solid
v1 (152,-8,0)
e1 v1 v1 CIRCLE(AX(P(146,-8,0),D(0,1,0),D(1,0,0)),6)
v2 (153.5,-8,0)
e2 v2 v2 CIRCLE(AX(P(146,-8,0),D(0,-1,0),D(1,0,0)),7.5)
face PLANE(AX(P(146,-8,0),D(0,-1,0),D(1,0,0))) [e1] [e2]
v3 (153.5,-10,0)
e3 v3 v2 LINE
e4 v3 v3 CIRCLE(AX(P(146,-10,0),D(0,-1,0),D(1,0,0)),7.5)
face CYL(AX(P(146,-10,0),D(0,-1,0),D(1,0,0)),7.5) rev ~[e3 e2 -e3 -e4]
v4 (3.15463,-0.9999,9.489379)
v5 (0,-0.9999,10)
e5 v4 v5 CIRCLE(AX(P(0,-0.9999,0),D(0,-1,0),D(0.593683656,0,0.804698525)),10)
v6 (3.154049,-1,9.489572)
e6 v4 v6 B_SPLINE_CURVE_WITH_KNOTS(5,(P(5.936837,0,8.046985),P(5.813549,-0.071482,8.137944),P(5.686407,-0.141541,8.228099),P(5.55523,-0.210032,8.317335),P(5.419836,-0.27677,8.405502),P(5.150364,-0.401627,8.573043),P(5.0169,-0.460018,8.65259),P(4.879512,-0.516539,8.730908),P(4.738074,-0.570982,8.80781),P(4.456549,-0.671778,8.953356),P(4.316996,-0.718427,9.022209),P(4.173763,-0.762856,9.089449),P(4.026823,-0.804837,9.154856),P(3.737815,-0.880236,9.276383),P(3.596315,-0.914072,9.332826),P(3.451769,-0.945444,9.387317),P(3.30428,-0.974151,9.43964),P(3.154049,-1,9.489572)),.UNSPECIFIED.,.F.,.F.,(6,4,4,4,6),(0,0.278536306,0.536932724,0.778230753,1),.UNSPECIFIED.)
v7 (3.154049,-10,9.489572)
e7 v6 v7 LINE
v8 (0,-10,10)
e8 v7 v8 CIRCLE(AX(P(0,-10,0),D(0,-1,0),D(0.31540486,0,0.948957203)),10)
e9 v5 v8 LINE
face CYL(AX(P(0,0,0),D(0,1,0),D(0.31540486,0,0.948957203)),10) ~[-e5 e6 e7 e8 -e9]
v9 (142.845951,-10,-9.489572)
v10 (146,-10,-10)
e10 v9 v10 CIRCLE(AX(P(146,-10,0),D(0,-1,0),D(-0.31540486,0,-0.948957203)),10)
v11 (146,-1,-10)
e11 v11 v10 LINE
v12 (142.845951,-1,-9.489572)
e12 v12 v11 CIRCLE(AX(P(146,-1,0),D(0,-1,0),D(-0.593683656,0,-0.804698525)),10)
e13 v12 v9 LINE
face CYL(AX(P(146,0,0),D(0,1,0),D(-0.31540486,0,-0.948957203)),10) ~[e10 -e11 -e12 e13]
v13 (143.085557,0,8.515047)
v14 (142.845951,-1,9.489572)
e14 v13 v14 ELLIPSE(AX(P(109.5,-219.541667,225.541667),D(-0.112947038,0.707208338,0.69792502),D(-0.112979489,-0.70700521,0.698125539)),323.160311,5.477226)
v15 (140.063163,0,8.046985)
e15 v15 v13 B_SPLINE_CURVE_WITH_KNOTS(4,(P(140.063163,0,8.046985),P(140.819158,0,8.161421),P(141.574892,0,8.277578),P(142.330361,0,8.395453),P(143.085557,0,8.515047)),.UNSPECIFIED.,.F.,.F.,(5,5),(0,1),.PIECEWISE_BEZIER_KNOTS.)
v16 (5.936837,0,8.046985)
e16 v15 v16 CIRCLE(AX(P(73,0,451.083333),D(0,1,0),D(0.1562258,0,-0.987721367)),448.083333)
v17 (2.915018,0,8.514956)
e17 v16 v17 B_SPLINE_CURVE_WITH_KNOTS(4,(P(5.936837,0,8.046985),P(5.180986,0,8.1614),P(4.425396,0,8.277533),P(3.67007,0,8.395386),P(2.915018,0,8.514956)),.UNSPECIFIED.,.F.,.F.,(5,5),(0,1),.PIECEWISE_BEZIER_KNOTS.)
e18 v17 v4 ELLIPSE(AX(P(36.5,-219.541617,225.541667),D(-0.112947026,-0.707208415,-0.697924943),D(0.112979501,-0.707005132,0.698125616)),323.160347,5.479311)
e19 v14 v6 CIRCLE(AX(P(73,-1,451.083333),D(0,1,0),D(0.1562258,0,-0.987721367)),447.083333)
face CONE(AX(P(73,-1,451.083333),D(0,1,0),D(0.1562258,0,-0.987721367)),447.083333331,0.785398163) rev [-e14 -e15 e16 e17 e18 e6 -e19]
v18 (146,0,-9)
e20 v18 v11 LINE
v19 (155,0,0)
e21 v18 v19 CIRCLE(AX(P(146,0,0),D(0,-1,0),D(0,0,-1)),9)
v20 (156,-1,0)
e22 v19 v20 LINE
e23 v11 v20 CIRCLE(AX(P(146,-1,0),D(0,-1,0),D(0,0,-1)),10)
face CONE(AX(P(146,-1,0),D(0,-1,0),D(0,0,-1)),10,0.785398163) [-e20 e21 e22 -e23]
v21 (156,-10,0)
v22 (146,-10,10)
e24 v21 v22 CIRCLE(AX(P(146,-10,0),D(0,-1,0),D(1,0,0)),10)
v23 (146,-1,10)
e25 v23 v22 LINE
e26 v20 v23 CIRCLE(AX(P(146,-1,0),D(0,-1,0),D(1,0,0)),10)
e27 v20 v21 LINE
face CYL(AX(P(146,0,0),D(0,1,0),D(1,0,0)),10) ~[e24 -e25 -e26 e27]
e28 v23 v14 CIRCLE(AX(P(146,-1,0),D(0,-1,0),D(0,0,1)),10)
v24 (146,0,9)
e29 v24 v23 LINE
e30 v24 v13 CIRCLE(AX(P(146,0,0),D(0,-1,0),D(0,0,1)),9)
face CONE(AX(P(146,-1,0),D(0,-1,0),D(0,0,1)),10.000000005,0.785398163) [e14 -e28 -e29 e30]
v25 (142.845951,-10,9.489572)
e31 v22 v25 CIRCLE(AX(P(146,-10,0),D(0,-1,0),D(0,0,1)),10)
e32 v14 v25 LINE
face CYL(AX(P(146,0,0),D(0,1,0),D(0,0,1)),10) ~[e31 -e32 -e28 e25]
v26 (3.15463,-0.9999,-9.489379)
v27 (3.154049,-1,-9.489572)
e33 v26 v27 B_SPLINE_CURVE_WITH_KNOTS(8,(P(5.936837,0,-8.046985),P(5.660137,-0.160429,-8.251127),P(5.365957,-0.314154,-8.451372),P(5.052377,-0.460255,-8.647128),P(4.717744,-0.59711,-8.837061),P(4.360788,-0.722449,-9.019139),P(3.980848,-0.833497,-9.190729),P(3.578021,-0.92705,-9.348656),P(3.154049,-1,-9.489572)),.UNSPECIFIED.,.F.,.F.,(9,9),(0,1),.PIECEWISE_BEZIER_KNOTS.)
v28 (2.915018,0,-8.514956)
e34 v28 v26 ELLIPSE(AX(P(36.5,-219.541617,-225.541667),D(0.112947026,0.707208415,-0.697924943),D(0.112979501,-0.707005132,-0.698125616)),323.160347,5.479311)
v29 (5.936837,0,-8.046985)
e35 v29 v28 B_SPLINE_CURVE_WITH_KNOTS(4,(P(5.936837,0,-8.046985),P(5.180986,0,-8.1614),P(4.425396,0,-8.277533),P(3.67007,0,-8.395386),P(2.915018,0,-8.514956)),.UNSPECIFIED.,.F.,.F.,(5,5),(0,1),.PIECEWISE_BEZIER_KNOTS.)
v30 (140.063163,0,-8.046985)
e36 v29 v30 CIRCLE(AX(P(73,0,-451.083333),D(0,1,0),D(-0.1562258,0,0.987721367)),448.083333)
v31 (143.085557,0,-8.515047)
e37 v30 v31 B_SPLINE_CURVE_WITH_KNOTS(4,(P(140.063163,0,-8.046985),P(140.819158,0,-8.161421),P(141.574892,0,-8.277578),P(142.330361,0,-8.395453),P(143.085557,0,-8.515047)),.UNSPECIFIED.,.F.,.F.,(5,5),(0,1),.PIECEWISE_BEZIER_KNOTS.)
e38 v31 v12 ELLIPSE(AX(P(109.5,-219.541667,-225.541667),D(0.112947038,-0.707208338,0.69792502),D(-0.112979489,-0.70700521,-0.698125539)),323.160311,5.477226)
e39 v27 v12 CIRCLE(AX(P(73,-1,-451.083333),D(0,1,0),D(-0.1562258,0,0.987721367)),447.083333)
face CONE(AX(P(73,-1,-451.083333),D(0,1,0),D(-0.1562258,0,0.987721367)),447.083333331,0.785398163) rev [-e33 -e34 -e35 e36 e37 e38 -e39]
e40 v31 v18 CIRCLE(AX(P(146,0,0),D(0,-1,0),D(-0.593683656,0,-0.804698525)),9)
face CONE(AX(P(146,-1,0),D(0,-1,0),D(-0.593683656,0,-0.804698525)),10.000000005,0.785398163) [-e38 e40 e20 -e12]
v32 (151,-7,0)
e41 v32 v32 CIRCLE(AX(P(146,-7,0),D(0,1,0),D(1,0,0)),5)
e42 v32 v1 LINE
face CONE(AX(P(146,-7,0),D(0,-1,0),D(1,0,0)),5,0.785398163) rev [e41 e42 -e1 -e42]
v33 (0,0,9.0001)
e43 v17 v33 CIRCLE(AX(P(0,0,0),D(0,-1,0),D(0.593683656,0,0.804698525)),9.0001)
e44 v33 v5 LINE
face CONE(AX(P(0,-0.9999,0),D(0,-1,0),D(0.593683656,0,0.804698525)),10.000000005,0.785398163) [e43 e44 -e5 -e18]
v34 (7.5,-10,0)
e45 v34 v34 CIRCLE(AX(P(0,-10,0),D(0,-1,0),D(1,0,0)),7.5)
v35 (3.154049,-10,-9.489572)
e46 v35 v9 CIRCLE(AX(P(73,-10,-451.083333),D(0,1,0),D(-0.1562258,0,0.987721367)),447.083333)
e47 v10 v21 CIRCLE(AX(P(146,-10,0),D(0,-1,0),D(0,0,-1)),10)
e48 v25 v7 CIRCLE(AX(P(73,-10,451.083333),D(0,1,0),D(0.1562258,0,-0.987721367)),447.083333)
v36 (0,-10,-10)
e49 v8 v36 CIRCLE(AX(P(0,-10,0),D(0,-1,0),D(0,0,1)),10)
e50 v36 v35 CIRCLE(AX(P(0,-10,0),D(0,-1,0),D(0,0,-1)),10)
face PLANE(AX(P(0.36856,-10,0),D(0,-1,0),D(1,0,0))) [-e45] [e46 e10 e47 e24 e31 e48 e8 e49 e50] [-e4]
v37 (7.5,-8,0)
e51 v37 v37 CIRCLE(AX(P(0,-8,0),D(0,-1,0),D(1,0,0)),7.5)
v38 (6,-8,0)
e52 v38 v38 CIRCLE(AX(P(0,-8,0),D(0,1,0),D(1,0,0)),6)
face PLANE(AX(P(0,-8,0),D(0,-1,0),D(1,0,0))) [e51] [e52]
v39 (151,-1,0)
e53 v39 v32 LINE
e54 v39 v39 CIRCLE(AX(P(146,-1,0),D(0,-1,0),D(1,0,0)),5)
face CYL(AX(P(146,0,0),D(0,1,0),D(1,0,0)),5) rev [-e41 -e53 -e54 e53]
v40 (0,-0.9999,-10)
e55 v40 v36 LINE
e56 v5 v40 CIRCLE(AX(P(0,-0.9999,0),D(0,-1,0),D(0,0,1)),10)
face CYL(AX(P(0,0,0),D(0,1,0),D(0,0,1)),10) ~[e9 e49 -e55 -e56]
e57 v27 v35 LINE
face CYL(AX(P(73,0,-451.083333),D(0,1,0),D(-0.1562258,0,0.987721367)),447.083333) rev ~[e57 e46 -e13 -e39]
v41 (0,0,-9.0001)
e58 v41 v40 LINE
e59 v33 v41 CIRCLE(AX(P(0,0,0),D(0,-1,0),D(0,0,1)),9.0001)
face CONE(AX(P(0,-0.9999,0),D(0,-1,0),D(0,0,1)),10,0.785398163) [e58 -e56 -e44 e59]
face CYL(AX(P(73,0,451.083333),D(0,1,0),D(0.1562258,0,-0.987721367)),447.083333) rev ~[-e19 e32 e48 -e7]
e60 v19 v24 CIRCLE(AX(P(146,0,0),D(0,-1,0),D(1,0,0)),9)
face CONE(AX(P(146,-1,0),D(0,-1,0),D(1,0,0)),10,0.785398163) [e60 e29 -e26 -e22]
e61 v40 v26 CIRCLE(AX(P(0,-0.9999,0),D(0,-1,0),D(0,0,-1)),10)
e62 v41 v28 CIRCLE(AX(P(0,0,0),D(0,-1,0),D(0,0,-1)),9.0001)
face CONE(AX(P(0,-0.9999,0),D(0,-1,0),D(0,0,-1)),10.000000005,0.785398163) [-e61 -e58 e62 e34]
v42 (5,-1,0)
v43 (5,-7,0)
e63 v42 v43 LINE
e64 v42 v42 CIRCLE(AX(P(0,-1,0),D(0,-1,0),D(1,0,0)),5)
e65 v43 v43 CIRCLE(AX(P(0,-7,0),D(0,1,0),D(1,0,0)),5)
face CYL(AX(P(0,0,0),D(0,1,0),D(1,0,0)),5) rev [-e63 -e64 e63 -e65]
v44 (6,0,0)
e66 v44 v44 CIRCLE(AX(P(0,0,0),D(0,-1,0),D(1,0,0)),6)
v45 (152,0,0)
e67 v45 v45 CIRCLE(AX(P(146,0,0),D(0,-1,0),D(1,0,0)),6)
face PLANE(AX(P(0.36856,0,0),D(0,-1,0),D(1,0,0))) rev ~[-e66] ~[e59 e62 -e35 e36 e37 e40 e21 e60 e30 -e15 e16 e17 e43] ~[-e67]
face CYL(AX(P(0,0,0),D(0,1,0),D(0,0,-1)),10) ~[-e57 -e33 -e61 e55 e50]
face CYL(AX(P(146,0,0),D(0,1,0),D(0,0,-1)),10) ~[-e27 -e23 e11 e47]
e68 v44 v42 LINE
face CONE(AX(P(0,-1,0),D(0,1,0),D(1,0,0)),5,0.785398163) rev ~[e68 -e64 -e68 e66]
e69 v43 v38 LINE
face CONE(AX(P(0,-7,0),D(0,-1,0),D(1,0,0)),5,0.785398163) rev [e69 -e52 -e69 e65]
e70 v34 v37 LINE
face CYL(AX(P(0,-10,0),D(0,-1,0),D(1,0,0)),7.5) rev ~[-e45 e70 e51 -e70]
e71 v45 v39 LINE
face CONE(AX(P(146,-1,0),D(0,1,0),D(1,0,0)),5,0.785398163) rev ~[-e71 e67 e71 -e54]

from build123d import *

# Parameters (mm, degrees)
F0_R       = 5
F1_DEPTH   = 10
F2_R       = 7.5
F3_DEPTH   = 2
F4_C1_SIZE = 1
F4_C2_SIZE = 1
F4_C3_SIZE = 1
F4_C4_SIZE = 1
F4_C5_SIZE = 1
F4_C6_SIZE = 1
F4_C7_SIZE = 0.9999
F4_C8_SIZE = 1


# Not quite as in the source:
# - a fillet or chamfer is up to 0.001 mm smaller than in the source, because OpenCascade refuses the exact size


with BuildPart() as f1:
    # F0 (on Front) → F1 (new body)
    with BuildSketch(Plane.XZ):
        with BuildLine():
            ThreePointArc((3.1540486056, 9.4895720343), (1.5765683293, 9.7419684548), (0, 10))
            ThreePointArc((0, 10), (-10, 0), (0, -10))
            ThreePointArc((0, -10), (1.5765683293, -9.7419684548), (3.1540486056, -9.4895720343))
            ThreePointArc((3.1540486056, -9.4895720343), (8.1098855126, -5.8506202211), (10, 0))
            ThreePointArc((10, 0), (8.1098855126, 5.8506202211), (3.1540486056, 9.4895720343))
        make_face()
        Circle(F0_R, mode=Mode.SUBTRACT)
        with BuildLine():
            ThreePointArc((3.1540486056, 9.4895720343), (1.5975418081, 9.8715682731), (0, 10))
            ThreePointArc((0, 10), (1.5765683293, 9.7419684548), (3.1540486056, 9.4895720343))
        make_face()
        with BuildLine():
            ThreePointArc((3.1540486056, -9.4895720343), (1.5765683293, -9.7419684548), (0, -10))
            ThreePointArc((0, -10), (1.5975418081, -9.8715682731), (3.1540486056, -9.4895720343))
        make_face()
        with BuildLine():
            ThreePointArc((142.8459513944, 9.4895720343), (73, 4), (3.1540486056, 9.4895720343))
            ThreePointArc((3.1540486056, 9.4895720343), (8.1098855126, 5.8506202211), (10, 0))
            ThreePointArc((10, 0), (8.1098855126, -5.8506202211), (3.1540486056, -9.4895720343))
            ThreePointArc((3.1540486056, -9.4895720343), (73, -4), (142.8459513944, -9.4895720343))
            ThreePointArc((142.8459513944, -9.4895720343), (136, 0), (142.8459513944, 9.4895720343))
        make_face()
        with BuildLine():
            ThreePointArc((146, 10), (144.4234316707, 9.7419684548), (142.8459513944, 9.4895720343))
            ThreePointArc((142.8459513944, 9.4895720343), (136, 0), (142.8459513944, -9.4895720343))
            ThreePointArc((142.8459513944, -9.4895720343), (144.4234316707, -9.7419684548), (146, -10))
            ThreePointArc((146, -10), (153.0710678119, -7.0710678119), (156, 0))
            ThreePointArc((156, 0), (153.0710678119, 7.0710678119), (146, 10))
        make_face()
        with Locations((146, 0)):
            Circle(F0_R, mode=Mode.SUBTRACT)
        with BuildLine():
            ThreePointArc((146, 10), (144.4024581919, 9.8715682731), (142.8459513944, 9.4895720343))
            ThreePointArc((142.8459513944, 9.4895720343), (144.4234316707, 9.7419684548), (146, 10))
        make_face()
        with BuildLine():
            ThreePointArc((146, -10), (144.4234316707, -9.7419684548), (142.8459513944, -9.4895720343))
            ThreePointArc((142.8459513944, -9.4895720343), (144.4024581919, -9.8715682731), (146, -10))
        make_face()
    extrude(amount=F1_DEPTH)

    # F2 (on face) → F3 (cut)
    with BuildSketch(Plane.XZ.offset(10)):
        Circle(F2_R)
        with Locations((146, 0)):
            Circle(F2_R)
    extrude(amount=-F3_DEPTH, mode=Mode.SUBTRACT)

    # F4: chamfer of 1 on 8 edges, made by hand

    # F4_c1
    f4_c1_edges = [f1.edges().sort_by_distance(p)[0] for p in [
        (73, 0, -4),
    ]]
    chamfer(f4_c1_edges, length=F4_C1_SIZE)

    # F4_c2
    f4_c2_edges = [f1.edges().sort_by_distance(p)[0] for p in [
        (73, 0, 3.9999999999),
    ]]
    chamfer(f4_c2_edges, length=F4_C2_SIZE)

    # F4_c3
    f4_c3_edges = [f1.edges().sort_by_distance(p)[0] for p in [
        (-5, 0, 0),
    ]]
    chamfer(f4_c3_edges, length=F4_C3_SIZE)

    # F4_c4
    f4_c4_edges = [f1.edges().sort_by_distance(p)[0] for p in [
        (141, 0, 0),
    ]]
    chamfer(f4_c4_edges, length=F4_C4_SIZE)

    # F4_c5
    f4_c5_edges = [f1.edges().sort_by_distance(p)[0] for p in [
        (-5, -8, 0),
    ]]
    chamfer(f4_c5_edges, length=F4_C5_SIZE)

    # F4_c6
    f4_c6_edges = [f1.edges().sort_by_distance(p)[0] for p in [
        (141, -8, 0),
    ]]
    chamfer(f4_c6_edges, length=F4_C6_SIZE)

    # F4_c7 (size 1 in the source; OpenCascade refuses exactly that, so slightly less here)
    f4_c7_edges = [f1.edges().sort_by_distance(p)[0] for p in [
        (-10, 0, 0),
    ]]
    chamfer(f4_c7_edges, length=F4_C7_SIZE)

    # F4_c8
    f4_c8_edges = [f1.edges().sort_by_distance(p)[0] for p in [
        (156, 0, 0),
    ]]
    chamfer(f4_c8_edges, length=F4_C8_SIZE)


solid = f1.part
